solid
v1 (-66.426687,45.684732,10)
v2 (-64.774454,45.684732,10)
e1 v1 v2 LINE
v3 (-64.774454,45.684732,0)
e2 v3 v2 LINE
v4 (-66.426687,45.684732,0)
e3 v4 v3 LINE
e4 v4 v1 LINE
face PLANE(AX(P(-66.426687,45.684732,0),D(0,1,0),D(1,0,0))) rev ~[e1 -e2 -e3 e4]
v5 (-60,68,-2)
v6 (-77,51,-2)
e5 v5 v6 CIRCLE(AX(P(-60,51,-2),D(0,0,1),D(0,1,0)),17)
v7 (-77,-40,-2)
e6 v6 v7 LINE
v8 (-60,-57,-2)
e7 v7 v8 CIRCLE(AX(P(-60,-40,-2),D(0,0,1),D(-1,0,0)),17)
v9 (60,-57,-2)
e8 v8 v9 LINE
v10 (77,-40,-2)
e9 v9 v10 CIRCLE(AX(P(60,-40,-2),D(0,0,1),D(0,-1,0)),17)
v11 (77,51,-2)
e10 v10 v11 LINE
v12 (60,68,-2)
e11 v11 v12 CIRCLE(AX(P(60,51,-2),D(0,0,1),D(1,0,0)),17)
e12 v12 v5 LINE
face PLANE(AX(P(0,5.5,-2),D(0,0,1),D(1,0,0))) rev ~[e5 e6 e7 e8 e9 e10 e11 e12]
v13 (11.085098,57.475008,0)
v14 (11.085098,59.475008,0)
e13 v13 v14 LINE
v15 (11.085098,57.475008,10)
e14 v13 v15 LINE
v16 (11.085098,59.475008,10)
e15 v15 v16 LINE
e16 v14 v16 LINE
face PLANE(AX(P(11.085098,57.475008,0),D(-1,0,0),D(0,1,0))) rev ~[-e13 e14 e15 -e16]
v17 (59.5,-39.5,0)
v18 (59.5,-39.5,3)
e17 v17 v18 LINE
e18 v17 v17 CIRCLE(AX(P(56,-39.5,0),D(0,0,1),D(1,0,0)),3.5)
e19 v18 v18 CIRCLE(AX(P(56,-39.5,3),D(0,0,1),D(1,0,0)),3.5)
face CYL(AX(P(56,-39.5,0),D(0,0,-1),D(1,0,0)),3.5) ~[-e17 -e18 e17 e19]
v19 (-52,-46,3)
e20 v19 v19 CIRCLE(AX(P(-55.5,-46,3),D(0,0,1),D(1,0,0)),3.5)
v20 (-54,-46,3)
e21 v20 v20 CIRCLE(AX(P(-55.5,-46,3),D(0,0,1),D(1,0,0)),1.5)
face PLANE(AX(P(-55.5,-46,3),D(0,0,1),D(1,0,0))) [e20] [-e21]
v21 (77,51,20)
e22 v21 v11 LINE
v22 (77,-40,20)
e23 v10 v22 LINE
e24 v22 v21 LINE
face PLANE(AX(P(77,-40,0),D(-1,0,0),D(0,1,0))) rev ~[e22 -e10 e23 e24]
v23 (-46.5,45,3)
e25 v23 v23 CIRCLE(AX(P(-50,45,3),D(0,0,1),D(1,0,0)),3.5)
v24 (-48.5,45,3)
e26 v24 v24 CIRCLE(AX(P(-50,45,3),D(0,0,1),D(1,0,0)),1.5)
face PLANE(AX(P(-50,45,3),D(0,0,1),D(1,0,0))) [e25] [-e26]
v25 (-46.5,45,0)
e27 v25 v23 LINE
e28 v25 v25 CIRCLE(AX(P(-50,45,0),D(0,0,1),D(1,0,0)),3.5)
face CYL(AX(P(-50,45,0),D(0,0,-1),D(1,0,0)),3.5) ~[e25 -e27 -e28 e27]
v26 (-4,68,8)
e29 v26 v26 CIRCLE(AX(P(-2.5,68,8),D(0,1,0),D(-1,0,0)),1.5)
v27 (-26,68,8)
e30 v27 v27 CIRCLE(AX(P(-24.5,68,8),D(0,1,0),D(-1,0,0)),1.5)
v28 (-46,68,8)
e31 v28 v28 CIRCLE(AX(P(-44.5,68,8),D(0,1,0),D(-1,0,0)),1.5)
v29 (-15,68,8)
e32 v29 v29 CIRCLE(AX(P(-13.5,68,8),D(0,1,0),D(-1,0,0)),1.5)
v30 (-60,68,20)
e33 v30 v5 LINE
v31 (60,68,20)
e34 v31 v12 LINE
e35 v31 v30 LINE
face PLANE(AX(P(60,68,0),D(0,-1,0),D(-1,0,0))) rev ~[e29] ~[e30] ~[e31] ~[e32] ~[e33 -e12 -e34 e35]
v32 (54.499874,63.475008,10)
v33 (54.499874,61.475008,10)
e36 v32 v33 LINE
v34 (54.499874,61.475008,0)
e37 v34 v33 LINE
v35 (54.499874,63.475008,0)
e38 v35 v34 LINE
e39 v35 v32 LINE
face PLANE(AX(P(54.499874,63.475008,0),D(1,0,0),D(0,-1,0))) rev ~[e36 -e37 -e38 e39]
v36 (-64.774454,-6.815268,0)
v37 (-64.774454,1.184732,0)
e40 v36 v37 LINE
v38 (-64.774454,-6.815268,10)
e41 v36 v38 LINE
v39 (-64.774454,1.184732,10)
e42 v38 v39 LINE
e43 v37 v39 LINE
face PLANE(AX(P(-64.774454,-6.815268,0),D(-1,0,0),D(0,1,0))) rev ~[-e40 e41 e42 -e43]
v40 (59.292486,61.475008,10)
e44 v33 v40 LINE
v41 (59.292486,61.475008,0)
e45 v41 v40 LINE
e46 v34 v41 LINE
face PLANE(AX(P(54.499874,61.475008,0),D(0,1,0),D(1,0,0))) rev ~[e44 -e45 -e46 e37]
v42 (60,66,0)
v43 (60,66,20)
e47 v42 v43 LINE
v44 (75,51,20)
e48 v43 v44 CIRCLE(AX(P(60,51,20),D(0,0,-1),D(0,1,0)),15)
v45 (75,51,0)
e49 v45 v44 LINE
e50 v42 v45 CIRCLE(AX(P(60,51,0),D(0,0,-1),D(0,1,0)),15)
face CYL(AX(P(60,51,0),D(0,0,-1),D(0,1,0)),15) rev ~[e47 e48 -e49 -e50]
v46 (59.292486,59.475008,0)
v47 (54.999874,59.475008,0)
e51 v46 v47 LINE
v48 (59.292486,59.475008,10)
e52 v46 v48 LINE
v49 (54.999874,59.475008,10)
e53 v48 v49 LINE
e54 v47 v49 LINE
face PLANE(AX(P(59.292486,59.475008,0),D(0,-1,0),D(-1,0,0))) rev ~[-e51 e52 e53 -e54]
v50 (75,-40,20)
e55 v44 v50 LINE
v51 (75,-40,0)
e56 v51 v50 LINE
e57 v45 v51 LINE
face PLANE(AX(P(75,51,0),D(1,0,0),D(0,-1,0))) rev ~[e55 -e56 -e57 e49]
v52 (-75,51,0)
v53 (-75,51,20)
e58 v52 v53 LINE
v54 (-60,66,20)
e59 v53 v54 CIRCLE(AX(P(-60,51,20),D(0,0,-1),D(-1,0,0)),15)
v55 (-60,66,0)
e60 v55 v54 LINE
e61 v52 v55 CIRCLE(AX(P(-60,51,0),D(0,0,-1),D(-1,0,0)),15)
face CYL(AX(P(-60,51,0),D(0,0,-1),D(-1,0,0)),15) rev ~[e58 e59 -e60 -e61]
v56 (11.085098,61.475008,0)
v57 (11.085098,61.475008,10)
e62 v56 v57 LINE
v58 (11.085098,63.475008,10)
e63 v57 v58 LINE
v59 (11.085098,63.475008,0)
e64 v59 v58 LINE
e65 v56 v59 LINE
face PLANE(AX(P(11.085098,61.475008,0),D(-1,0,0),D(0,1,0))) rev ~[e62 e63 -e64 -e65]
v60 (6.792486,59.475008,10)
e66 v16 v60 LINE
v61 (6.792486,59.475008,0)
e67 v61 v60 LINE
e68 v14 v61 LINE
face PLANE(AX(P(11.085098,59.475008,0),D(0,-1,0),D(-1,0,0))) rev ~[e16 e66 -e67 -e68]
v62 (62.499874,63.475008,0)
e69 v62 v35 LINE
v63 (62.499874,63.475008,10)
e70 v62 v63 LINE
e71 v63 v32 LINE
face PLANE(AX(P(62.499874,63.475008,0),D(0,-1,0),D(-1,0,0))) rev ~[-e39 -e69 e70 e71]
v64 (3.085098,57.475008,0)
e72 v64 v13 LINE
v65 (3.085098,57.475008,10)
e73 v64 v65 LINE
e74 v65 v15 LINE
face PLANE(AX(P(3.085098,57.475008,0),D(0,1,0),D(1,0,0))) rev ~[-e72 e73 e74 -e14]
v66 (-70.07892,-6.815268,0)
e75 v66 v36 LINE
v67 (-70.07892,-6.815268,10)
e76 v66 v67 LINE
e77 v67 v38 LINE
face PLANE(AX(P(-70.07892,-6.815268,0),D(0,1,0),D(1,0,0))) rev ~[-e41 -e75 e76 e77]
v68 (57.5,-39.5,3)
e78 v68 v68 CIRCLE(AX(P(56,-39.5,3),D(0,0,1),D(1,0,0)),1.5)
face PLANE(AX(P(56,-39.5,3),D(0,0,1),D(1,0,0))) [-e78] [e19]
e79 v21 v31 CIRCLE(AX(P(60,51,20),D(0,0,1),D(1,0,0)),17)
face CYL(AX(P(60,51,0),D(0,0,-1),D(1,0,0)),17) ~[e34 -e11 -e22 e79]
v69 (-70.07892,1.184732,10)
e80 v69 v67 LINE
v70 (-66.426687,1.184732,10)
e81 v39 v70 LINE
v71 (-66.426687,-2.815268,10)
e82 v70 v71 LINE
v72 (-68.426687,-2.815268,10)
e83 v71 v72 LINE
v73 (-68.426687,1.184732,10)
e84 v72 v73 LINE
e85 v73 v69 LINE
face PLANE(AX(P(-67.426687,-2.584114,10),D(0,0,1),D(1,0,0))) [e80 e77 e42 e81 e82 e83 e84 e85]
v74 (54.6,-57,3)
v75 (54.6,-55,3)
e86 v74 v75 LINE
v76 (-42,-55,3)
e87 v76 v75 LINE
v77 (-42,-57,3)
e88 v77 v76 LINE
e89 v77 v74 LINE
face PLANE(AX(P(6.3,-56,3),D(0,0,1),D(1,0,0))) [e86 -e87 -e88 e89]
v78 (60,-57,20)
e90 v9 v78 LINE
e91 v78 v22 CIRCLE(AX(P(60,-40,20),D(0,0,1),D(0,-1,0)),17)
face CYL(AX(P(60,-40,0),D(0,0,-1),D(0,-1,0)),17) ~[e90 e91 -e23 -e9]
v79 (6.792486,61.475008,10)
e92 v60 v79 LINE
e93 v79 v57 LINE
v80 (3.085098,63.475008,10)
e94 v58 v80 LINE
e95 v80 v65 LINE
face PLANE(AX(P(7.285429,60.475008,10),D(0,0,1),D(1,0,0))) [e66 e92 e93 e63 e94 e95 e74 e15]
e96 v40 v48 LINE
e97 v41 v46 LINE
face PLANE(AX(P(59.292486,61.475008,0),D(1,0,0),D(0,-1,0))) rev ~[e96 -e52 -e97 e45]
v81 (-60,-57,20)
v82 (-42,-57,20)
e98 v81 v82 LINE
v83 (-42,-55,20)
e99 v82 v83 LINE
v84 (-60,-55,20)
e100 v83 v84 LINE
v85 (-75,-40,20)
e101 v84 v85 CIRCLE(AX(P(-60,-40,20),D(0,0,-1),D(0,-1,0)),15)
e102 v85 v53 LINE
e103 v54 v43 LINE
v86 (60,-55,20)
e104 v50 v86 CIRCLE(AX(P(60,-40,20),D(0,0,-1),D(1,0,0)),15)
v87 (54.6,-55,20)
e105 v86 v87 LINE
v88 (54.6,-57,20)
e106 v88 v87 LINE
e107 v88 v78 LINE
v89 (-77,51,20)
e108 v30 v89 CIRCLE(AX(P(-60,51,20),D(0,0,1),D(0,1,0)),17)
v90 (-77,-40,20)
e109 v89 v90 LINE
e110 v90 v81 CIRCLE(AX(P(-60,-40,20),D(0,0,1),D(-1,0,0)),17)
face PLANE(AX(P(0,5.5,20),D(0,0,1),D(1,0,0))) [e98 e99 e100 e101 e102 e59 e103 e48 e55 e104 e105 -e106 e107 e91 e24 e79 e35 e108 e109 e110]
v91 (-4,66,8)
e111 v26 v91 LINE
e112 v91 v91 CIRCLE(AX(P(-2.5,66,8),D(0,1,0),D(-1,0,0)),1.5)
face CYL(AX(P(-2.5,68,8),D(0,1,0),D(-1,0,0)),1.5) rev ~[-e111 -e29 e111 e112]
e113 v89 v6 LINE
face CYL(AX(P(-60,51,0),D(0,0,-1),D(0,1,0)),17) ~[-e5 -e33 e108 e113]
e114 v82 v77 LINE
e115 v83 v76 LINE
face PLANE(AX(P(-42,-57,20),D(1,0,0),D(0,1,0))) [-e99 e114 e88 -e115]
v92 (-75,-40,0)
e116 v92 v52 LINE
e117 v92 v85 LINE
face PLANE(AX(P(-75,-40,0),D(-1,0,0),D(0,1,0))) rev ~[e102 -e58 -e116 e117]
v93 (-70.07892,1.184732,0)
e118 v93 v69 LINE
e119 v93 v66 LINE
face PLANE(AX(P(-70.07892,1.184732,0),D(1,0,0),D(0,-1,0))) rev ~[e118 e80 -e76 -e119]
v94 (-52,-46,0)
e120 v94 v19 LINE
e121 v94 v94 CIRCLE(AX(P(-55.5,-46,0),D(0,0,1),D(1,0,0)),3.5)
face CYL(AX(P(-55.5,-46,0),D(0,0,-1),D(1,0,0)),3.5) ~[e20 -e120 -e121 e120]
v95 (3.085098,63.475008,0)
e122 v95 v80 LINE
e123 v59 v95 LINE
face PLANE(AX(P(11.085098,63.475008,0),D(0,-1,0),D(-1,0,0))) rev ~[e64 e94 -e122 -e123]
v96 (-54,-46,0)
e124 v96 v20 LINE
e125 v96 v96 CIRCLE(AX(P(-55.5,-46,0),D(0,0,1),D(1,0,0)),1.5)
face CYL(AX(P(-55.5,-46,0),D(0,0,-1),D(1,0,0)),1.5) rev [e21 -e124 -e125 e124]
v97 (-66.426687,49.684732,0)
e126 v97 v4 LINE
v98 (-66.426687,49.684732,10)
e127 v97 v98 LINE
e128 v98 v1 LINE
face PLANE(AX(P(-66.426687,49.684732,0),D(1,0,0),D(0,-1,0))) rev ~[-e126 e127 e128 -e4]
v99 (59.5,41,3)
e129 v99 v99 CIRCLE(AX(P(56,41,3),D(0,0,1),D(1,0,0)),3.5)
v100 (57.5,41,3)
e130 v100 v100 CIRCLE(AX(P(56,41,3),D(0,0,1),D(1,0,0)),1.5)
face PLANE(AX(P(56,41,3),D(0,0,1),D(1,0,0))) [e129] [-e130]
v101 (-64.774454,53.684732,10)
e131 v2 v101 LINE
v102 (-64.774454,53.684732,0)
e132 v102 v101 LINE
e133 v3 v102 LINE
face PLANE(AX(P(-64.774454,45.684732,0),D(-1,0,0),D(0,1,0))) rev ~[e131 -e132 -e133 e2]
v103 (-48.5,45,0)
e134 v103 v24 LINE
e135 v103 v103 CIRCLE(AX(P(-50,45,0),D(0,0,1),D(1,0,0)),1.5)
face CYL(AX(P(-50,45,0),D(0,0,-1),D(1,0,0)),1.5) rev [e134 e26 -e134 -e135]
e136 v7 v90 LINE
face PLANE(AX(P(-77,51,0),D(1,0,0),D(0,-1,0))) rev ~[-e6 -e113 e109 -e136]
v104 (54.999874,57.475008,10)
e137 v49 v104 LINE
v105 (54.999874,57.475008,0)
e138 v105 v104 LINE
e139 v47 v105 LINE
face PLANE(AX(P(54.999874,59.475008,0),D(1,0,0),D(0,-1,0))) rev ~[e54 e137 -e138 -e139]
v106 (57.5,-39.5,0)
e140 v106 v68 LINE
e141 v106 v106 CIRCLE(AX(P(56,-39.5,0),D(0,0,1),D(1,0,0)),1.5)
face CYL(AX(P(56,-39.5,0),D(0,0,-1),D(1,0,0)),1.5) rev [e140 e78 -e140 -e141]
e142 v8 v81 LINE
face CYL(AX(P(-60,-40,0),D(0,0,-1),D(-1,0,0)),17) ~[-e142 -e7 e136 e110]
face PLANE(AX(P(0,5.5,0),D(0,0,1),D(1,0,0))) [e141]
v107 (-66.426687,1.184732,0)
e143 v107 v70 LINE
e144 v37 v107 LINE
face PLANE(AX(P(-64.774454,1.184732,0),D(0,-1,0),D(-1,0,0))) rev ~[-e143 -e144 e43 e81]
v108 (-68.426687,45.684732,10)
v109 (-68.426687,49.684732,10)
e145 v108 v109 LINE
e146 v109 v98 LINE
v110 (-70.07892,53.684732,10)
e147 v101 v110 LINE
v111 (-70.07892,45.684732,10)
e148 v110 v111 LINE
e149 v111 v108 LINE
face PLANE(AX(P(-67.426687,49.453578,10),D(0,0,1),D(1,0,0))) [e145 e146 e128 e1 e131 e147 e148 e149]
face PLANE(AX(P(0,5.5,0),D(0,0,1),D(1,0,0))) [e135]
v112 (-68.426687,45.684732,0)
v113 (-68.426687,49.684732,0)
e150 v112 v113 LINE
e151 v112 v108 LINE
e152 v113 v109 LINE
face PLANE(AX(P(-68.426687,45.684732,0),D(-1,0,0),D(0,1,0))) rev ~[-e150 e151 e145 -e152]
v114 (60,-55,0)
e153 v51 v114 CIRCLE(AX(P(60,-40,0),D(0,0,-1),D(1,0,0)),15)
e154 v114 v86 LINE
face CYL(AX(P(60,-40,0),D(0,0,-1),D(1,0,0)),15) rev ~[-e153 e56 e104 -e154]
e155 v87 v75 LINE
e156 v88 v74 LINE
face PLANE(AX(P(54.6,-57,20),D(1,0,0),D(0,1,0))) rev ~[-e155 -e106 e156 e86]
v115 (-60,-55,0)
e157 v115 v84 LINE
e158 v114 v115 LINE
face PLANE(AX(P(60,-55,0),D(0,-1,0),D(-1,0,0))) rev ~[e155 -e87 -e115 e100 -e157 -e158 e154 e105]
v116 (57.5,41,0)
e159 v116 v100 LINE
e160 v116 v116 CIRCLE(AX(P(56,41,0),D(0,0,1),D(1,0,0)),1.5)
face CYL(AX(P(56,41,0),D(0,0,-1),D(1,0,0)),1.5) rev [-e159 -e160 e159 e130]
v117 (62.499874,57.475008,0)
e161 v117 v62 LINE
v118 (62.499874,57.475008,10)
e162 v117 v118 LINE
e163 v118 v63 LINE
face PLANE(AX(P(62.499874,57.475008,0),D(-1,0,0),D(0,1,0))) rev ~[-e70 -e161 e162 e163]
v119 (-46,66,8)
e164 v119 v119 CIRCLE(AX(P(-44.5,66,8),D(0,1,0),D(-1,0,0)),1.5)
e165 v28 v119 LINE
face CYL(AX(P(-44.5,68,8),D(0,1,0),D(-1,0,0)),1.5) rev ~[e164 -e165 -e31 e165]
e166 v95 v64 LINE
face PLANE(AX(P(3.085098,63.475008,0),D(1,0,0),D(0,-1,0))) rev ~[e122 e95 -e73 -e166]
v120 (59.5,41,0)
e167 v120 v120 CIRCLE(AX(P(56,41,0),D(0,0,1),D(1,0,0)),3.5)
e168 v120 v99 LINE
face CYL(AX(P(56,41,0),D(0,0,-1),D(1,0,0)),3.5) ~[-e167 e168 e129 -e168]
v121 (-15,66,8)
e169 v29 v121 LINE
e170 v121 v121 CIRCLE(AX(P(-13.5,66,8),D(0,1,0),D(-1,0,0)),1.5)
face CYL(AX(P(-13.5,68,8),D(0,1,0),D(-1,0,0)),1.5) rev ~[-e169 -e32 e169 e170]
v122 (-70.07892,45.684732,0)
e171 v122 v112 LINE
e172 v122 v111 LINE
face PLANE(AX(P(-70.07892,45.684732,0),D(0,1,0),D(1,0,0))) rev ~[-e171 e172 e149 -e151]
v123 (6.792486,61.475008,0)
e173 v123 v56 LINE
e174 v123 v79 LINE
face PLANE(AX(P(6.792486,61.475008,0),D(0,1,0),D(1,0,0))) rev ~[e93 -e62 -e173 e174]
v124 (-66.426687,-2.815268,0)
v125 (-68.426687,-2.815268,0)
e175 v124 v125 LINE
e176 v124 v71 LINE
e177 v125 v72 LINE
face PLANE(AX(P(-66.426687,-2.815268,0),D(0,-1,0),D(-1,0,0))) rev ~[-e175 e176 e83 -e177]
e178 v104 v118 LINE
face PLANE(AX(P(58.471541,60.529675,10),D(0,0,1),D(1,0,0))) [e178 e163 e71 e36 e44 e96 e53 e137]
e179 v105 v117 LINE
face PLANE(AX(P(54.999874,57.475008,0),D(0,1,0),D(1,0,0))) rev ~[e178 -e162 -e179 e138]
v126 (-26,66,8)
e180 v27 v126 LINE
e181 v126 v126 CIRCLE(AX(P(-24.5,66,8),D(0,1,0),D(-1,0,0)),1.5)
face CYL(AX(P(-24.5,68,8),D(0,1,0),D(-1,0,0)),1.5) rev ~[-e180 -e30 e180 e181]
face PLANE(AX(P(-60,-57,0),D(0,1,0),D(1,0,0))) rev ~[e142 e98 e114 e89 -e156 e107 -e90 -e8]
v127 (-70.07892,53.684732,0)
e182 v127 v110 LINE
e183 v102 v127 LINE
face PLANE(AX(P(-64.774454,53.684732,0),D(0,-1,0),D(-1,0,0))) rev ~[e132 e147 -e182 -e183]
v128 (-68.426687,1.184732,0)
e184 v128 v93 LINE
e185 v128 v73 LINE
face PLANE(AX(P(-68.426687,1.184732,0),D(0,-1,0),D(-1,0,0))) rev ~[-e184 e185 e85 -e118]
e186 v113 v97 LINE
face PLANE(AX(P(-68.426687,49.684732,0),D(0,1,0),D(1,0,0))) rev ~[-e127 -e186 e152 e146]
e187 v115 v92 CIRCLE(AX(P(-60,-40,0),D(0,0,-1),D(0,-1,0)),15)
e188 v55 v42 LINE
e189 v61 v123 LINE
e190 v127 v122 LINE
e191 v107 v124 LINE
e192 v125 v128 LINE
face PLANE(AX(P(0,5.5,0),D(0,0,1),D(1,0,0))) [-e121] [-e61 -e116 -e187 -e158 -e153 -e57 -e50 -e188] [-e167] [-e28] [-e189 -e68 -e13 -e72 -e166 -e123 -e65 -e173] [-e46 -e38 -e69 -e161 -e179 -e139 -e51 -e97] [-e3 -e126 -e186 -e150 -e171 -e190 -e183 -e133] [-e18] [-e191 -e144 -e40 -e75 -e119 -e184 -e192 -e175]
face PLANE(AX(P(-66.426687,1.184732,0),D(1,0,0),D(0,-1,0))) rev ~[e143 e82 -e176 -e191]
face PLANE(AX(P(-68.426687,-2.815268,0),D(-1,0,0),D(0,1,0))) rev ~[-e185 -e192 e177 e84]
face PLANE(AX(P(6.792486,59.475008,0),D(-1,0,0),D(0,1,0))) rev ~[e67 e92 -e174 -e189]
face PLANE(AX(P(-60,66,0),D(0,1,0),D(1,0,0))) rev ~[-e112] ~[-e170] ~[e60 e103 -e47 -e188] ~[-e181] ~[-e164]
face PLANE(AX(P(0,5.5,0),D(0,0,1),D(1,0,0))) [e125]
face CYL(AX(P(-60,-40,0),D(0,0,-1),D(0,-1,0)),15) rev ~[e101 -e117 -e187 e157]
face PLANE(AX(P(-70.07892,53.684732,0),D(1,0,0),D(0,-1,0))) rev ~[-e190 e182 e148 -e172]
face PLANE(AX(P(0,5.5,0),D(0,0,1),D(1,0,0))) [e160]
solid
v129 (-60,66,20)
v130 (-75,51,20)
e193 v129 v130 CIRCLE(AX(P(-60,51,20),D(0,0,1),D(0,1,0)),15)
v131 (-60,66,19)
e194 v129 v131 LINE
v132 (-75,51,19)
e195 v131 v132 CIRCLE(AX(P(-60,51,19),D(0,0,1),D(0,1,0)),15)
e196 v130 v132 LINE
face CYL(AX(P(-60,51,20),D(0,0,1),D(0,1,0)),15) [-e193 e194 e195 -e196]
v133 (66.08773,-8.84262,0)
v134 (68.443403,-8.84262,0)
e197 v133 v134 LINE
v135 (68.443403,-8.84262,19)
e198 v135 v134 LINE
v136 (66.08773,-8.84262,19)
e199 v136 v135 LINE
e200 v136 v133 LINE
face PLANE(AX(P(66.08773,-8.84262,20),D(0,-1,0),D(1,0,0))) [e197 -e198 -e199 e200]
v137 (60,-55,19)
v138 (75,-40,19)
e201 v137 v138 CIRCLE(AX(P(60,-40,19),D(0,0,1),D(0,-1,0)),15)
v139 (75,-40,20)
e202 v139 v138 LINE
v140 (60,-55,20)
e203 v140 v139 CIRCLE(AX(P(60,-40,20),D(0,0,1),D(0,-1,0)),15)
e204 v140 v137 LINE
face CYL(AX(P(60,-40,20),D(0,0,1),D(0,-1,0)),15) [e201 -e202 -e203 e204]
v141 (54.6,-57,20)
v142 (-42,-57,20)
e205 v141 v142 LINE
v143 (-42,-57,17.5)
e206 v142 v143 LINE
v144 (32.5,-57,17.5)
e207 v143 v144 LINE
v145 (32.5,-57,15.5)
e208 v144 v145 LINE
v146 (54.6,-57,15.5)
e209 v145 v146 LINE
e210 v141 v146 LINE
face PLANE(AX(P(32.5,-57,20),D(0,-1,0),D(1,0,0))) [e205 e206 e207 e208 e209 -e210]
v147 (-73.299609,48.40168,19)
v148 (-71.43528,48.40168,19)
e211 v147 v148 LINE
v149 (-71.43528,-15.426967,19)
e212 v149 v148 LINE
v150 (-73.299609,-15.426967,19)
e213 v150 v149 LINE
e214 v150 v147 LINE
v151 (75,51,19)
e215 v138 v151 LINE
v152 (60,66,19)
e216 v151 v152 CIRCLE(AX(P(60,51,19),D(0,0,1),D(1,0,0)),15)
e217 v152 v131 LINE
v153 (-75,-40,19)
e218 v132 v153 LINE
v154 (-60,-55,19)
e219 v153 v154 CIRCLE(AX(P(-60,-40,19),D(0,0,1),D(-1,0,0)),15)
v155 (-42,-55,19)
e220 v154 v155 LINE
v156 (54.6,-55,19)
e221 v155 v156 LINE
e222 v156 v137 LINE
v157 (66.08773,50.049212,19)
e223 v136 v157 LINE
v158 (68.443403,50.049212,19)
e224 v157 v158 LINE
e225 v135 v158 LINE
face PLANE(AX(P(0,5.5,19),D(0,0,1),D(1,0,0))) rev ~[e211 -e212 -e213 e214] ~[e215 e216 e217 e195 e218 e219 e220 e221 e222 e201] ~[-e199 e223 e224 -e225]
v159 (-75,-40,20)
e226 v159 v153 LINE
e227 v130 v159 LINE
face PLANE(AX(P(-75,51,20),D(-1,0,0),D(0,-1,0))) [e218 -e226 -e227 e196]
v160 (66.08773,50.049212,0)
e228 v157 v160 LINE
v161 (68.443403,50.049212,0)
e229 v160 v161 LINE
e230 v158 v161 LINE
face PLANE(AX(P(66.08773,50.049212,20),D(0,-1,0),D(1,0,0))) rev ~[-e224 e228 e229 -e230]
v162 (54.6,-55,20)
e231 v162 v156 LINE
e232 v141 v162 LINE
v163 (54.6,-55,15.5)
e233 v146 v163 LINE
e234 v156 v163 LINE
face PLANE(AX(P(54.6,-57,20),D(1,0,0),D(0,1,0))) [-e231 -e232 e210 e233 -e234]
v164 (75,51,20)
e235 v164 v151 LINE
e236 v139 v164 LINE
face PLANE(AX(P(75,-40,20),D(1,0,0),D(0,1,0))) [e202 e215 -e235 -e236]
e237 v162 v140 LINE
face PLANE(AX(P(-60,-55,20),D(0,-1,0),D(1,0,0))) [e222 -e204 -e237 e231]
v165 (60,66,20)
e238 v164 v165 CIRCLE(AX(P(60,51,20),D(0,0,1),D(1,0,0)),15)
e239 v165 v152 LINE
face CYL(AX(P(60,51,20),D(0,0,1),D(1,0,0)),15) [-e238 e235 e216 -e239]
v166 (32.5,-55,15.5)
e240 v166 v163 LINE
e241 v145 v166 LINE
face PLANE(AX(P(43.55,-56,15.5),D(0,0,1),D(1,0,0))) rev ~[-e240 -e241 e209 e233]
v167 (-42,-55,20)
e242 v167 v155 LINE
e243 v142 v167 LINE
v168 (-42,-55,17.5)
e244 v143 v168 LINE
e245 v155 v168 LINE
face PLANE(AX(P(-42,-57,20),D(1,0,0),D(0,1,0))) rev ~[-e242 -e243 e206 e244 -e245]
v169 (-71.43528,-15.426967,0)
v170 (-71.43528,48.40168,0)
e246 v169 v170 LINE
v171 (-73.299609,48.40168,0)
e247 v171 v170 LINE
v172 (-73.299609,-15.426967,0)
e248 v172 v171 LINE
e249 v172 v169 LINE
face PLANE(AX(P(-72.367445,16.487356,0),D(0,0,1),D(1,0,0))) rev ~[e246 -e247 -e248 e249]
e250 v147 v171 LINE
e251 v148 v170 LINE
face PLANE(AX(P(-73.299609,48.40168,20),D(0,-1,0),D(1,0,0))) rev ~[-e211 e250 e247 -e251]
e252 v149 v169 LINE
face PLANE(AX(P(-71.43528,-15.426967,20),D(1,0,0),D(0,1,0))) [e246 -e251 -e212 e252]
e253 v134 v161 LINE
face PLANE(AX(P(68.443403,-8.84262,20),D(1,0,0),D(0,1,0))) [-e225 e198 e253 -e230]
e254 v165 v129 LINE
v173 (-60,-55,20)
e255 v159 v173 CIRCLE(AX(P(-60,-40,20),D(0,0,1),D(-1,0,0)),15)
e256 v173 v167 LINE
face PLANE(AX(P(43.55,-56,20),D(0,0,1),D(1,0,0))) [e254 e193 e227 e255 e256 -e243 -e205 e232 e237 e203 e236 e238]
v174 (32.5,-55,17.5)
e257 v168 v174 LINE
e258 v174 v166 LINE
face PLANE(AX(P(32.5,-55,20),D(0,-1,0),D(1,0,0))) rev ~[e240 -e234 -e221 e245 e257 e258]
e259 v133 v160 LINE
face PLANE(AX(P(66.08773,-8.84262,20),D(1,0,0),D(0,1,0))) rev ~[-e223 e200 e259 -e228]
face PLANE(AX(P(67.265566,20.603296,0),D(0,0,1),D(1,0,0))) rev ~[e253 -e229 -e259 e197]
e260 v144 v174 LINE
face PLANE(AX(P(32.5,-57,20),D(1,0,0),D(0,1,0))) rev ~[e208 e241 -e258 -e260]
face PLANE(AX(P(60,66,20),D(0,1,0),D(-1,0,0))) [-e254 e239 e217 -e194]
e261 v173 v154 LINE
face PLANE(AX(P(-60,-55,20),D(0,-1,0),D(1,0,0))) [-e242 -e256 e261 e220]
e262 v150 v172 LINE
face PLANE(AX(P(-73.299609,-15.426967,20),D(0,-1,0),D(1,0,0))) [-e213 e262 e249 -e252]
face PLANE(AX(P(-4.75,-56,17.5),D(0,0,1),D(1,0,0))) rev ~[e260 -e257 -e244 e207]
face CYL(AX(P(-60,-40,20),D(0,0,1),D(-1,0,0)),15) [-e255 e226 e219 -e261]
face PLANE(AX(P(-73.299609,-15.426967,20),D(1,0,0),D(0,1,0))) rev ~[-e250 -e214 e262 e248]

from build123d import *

# Parameters (mm, degrees)
F0_W      = 120
F0_H      = 110
F0_R      = 3.5
F0_R_2    = 1.5
F1_DEPTH  = 2
F2_DEPTH  = 20
F3_DEPTH  = 3
F4_DEPTH  = 10
F5_W      = 96.6
F5_H      = 2
F6_DEPTH  = 17
F7_R      = 1.5
F8_DEPTH  = 2
F9_W      = 1.8643289804
F9_H      = 63.8286471367
F9_W_2    = 2.3556724191
F9_H_2    = 58.8918318972
F10_DEPTH = 1
F9_W_3    = 74.5
F9_H_3    = 2
F11_DEPTH = 2.5
F9_W_4    = 22.1
F12_DEPTH = 4.5
F13_DEPTH = 20


with BuildPart() as f1:
    # F0 (on Top) → F1 (new body)
    with BuildSketch(Plane.XY):
        with BuildLine():
            Line((-77, 51), (-77, -40))
            ThreePointArc((-77, -40), (-72.0208152802, -52.0208152802), (-60, -57))
            Line((-60, -57), (60, -57))
            ThreePointArc((60, -57), (72.0208152802, -52.0208152802), (77, -40))
            Line((77, -40), (77, 51))
            ThreePointArc((77, 51), (72.0208152802, 63.0208152802), (60, 68))
            Line((60, 68), (-60, 68))
            ThreePointArc((-60, 68), (-72.0208152802, 63.0208152802), (-77, 51))
        make_face()
        with BuildLine():
            Line((60, -55), (-60, -55))
            ThreePointArc((-60, -55), (-70.6066017178, -50.6066017178), (-75, -40))
            Line((-75, -40), (-75, 51))
            ThreePointArc((-75, 51), (-70.6066017178, 61.6066017178), (-60, 66))
            Line((-60, 66), (60, 66))
            ThreePointArc((60, 66), (70.6066017178, 61.6066017178), (75, 51))
            Line((75, 51), (75, -40))
            ThreePointArc((75, -40), (70.6066017178, -50.6066017178), (60, -55))
        make_face(mode=Mode.SUBTRACT)
        Rectangle(F0_W, F0_H)
        with Locations((-55.5, -46)):
            Circle(F0_R, mode=Mode.SUBTRACT)
        with Locations((56, -39.5)):
            Circle(F0_R, mode=Mode.SUBTRACT)
        with Locations((-50, 45)):
            Circle(F0_R, mode=Mode.SUBTRACT)
        with Locations((56, 41)):
            Circle(F0_R, mode=Mode.SUBTRACT)
        with BuildLine():
            ThreePointArc((-75, -40), (-70.6066017178, -50.6066017178), (-60, -55))
            Line((-60, -55), (-60, 55))
            Line((-60, 55), (60, 55))
            Line((60, 55), (60, -55))
            ThreePointArc((60, -55), (70.6066017178, -50.6066017178), (75, -40))
            Line((75, -40), (75, 51))
            ThreePointArc((75, 51), (70.6066017178, 61.6066017178), (60, 66))
            Line((60, 66), (-60, 66))
            ThreePointArc((-60, 66), (-70.6066017178, 61.6066017178), (-75, 51))
            Line((-75, 51), (-75, -40))
        make_face()
        Polygon((-68.426687021, -2.8152682781), (-66.426687021, -2.8152682781), (-66.426687021, 1.1847317219), (-64.77445364, 1.1847317219), (-64.77445364, -6.8152682781), (-70.078920402, -6.8152682781), (-70.078920402, 1.1847317219), (-68.426687021, 1.1847317219), align=None, mode=Mode.SUBTRACT)
        Polygon((-68.426687021, 45.6847317219), (-70.078920402, 45.6847317219), (-70.078920402, 53.6847317219), (-64.77445364, 53.6847317219), (-64.77445364, 45.6847317219), (-66.426687021, 45.6847317219), (-66.426687021, 49.6847317219), (-68.426687021, 49.6847317219), align=None, mode=Mode.SUBTRACT)
        Polygon((11.0850978998, 61.4750083983), (6.792485714, 61.4750083983), (6.792485714, 59.4750083983), (11.0850978998, 59.4750083983), (11.0850978998, 57.4750083983), (3.0850978998, 57.4750083983), (3.0850978998, 63.4750083983), (11.0850978998, 63.4750083983), align=None, mode=Mode.SUBTRACT)
        Polygon((59.292485714, 59.4750083983), (59.292485714, 61.4750083983), (54.4998735282, 61.4750083983), (54.4998735282, 63.4750083983), (62.4998735282, 63.4750083983), (62.4998735282, 57.4750083983), (54.9998735282, 57.4750083983), (54.9998735282, 59.4750083983), align=None, mode=Mode.SUBTRACT)
        Polygon((6.792485714, 59.4750083983), (6.792485714, 61.4750083983), (11.0850978998, 61.4750083983), (11.0850978998, 63.4750083983), (3.0850978998, 63.4750083983), (3.0850978998, 57.4750083983), (11.0850978998, 57.4750083983), (11.0850978998, 59.4750083983), align=None)
        with Locations((56, -39.5)):
            Circle(F0_R)
        with Locations((56, -39.5)):
            Circle(F0_R_2, mode=Mode.SUBTRACT)
        with Locations((-50, 45)):
            Circle(F0_R)
        with Locations((-50, 45)):
            Circle(F0_R_2, mode=Mode.SUBTRACT)
        with Locations((56, 41)):
            Circle(F0_R)
        with Locations((56, 41)):
            Circle(F0_R_2, mode=Mode.SUBTRACT)
        with Locations((-55.5, -46)):
            Circle(F0_R)
        with Locations((-55.5, -46)):
            Circle(F0_R_2, mode=Mode.SUBTRACT)
        Polygon((54.4998735282, 61.4750083983), (59.292485714, 61.4750083983), (59.292485714, 59.4750083983), (54.9998735282, 59.4750083983), (54.9998735282, 57.4750083983), (62.4998735282, 57.4750083983), (62.4998735282, 63.4750083983), (54.4998735282, 63.4750083983), align=None)
        Polygon((-70.078920402, 53.6847317219), (-70.078920402, 45.6847317219), (-68.426687021, 45.6847317219), (-68.426687021, 49.6847317219), (-66.426687021, 49.6847317219), (-66.426687021, 45.6847317219), (-64.77445364, 45.6847317219), (-64.77445364, 53.6847317219), align=None)
        Polygon((-66.426687021, 1.1847317219), (-66.426687021, -2.8152682781), (-68.426687021, -2.8152682781), (-68.426687021, 1.1847317219), (-70.078920402, 1.1847317219), (-70.078920402, -6.8152682781), (-64.77445364, -6.8152682781), (-64.77445364, 1.1847317219), align=None)
        with Locations((-55.5, -46)):
            Circle(F0_R_2)
        with Locations((56, 41)):
            Circle(F0_R_2)
        with Locations((-50, 45)):
            Circle(F0_R_2)
        with Locations((56, -39.5)):
            Circle(F0_R_2)
    extrude(amount=-F1_DEPTH)

    # F0 (on Top) → F2 (join)
    with BuildSketch(Plane.XY):
        with BuildLine():
            Line((-77, 51), (-77, -40))
            ThreePointArc((-77, -40), (-72.0208152802, -52.0208152802), (-60, -57))
            Line((-60, -57), (60, -57))
            ThreePointArc((60, -57), (72.0208152802, -52.0208152802), (77, -40))
            Line((77, -40), (77, 51))
            ThreePointArc((77, 51), (72.0208152802, 63.0208152802), (60, 68))
            Line((60, 68), (-60, 68))
            ThreePointArc((-60, 68), (-72.0208152802, 63.0208152802), (-77, 51))
        make_face()
        with BuildLine():
            Line((60, -55), (-60, -55))
            ThreePointArc((-60, -55), (-70.6066017178, -50.6066017178), (-75, -40))
            Line((-75, -40), (-75, 51))
            ThreePointArc((-75, 51), (-70.6066017178, 61.6066017178), (-60, 66))
            Line((-60, 66), (60, 66))
            ThreePointArc((60, 66), (70.6066017178, 61.6066017178), (75, 51))
            Line((75, 51), (75, -40))
            ThreePointArc((75, -40), (70.6066017178, -50.6066017178), (60, -55))
        make_face(mode=Mode.SUBTRACT)
    extrude(amount=F2_DEPTH)

    # F0 (on Top) → F3 (join)
    with BuildSketch(Plane.XY):
        with Locations((-50, 45)):
            Circle(F0_R)
        with Locations((-50, 45)):
            Circle(F0_R_2, mode=Mode.SUBTRACT)
        with Locations((56, 41)):
            Circle(F0_R)
        with Locations((56, 41)):
            Circle(F0_R_2, mode=Mode.SUBTRACT)
        with Locations((56, -39.5)):
            Circle(F0_R)
        with Locations((56, -39.5)):
            Circle(F0_R_2, mode=Mode.SUBTRACT)
        with Locations((-55.5, -46)):
            Circle(F0_R)
        with Locations((-55.5, -46)):
            Circle(F0_R_2, mode=Mode.SUBTRACT)
    extrude(amount=F3_DEPTH)

    # F0 (on Top) → F4 (join)
    with BuildSketch(Plane.XY):
        Polygon((6.792485714, 59.4750083983), (6.792485714, 61.4750083983), (11.0850978998, 61.4750083983), (11.0850978998, 63.4750083983), (3.0850978998, 63.4750083983), (3.0850978998, 57.4750083983), (11.0850978998, 57.4750083983), (11.0850978998, 59.4750083983), align=None)
        Polygon((54.4998735282, 61.4750083983), (59.292485714, 61.4750083983), (59.292485714, 59.4750083983), (54.9998735282, 59.4750083983), (54.9998735282, 57.4750083983), (62.4998735282, 57.4750083983), (62.4998735282, 63.4750083983), (54.4998735282, 63.4750083983), align=None)
        Polygon((-66.426687021, 1.1847317219), (-66.426687021, -2.8152682781), (-68.426687021, -2.8152682781), (-68.426687021, 1.1847317219), (-70.078920402, 1.1847317219), (-70.078920402, -6.8152682781), (-64.77445364, -6.8152682781), (-64.77445364, 1.1847317219), align=None)
        Polygon((-70.078920402, 53.6847317219), (-70.078920402, 45.6847317219), (-68.426687021, 45.6847317219), (-68.426687021, 49.6847317219), (-66.426687021, 49.6847317219), (-66.426687021, 45.6847317219), (-64.77445364, 45.6847317219), (-64.77445364, 53.6847317219), align=None)
    extrude(amount=F4_DEPTH)

    # F5 (on face) → F6 (cut, through all)
    with BuildSketch(Plane.XY.offset(20)):
        with Locations((6.3, -56)):
            Rectangle(F5_W, F5_H)
    extrude(amount=-F6_DEPTH, mode=Mode.SUBTRACT)

    # F7 (on face) → F8 (cut, through all)
    with BuildSketch(Plane(origin=(0, 68, 0), x_dir=(-1, 0, 0), z_dir=(0, 1, 0))):
        with Locations((2.5, 8)):
            Circle(F7_R)
        with Locations((13.5, 8)):
            Circle(F7_R)
        with Locations((24.5, 8)):
            Circle(F7_R)
        with Locations((44.5, 8)):
            Circle(F7_R)
    extrude(amount=-F8_DEPTH, mode=Mode.SUBTRACT)


with BuildPart() as f10:
    # F9 (on face) → F10 (new body)
    with BuildSketch(Plane.XY.offset(20)):
        with BuildLine():
            Line((-75, 51), (-75, -40))
            ThreePointArc((-75, -40), (-70.6066017178, -50.6066017178), (-60, -55))
            Line((-60, -55), (-42, -55))
            Line((-42, -55), (32.5, -55))
            Line((32.5, -55), (54.6, -55))
            Line((54.6, -55), (60, -55))
            ThreePointArc((60, -55), (70.6066017178, -50.6066017178), (75, -40))
            Line((75, -40), (75, 51))
            ThreePointArc((75, 51), (70.6066017178, 61.6066017178), (60, 66))
            Line((60, 66), (-60, 66))
            ThreePointArc((-60, 66), (-70.6066017178, 61.6066017178), (-75, 51))
        make_face()
        with Locations((-72.3674446344, 16.4873562753)):
            Rectangle(F9_W, F9_H, mode=Mode.SUBTRACT)
        with Locations((67.2655664384, 20.6032958813)):
            Rectangle(F9_W_2, F9_H_2, mode=Mode.SUBTRACT)
    extrude(amount=-F10_DEPTH)

    # F9 (on face) → F11 (join)
    with BuildSketch(Plane.XY.offset(20)):
        with Locations((-4.75, -56)):
            Rectangle(F9_W_3, F9_H_3)
    extrude(amount=-F11_DEPTH)

    # F9 (on face) → F12 (join)
    with BuildSketch(Plane.XY.offset(20)):
        with Locations((43.55, -56)):
            Rectangle(F9_W_4, F9_H_3)
    extrude(amount=-F12_DEPTH)

    # F9 (on face) → F13 (join, through all)
    with BuildSketch(Plane.XY.offset(20)):
        with Locations((-72.3674446344, 16.4873562753)):
            Rectangle(F9_W, F9_H)
        with Locations((67.2655664384, 20.6032958813)):
            Rectangle(F9_W_2, F9_H_2)
    extrude(amount=-F13_DEPTH)


solid = Compound([f1.part, f10.part])
